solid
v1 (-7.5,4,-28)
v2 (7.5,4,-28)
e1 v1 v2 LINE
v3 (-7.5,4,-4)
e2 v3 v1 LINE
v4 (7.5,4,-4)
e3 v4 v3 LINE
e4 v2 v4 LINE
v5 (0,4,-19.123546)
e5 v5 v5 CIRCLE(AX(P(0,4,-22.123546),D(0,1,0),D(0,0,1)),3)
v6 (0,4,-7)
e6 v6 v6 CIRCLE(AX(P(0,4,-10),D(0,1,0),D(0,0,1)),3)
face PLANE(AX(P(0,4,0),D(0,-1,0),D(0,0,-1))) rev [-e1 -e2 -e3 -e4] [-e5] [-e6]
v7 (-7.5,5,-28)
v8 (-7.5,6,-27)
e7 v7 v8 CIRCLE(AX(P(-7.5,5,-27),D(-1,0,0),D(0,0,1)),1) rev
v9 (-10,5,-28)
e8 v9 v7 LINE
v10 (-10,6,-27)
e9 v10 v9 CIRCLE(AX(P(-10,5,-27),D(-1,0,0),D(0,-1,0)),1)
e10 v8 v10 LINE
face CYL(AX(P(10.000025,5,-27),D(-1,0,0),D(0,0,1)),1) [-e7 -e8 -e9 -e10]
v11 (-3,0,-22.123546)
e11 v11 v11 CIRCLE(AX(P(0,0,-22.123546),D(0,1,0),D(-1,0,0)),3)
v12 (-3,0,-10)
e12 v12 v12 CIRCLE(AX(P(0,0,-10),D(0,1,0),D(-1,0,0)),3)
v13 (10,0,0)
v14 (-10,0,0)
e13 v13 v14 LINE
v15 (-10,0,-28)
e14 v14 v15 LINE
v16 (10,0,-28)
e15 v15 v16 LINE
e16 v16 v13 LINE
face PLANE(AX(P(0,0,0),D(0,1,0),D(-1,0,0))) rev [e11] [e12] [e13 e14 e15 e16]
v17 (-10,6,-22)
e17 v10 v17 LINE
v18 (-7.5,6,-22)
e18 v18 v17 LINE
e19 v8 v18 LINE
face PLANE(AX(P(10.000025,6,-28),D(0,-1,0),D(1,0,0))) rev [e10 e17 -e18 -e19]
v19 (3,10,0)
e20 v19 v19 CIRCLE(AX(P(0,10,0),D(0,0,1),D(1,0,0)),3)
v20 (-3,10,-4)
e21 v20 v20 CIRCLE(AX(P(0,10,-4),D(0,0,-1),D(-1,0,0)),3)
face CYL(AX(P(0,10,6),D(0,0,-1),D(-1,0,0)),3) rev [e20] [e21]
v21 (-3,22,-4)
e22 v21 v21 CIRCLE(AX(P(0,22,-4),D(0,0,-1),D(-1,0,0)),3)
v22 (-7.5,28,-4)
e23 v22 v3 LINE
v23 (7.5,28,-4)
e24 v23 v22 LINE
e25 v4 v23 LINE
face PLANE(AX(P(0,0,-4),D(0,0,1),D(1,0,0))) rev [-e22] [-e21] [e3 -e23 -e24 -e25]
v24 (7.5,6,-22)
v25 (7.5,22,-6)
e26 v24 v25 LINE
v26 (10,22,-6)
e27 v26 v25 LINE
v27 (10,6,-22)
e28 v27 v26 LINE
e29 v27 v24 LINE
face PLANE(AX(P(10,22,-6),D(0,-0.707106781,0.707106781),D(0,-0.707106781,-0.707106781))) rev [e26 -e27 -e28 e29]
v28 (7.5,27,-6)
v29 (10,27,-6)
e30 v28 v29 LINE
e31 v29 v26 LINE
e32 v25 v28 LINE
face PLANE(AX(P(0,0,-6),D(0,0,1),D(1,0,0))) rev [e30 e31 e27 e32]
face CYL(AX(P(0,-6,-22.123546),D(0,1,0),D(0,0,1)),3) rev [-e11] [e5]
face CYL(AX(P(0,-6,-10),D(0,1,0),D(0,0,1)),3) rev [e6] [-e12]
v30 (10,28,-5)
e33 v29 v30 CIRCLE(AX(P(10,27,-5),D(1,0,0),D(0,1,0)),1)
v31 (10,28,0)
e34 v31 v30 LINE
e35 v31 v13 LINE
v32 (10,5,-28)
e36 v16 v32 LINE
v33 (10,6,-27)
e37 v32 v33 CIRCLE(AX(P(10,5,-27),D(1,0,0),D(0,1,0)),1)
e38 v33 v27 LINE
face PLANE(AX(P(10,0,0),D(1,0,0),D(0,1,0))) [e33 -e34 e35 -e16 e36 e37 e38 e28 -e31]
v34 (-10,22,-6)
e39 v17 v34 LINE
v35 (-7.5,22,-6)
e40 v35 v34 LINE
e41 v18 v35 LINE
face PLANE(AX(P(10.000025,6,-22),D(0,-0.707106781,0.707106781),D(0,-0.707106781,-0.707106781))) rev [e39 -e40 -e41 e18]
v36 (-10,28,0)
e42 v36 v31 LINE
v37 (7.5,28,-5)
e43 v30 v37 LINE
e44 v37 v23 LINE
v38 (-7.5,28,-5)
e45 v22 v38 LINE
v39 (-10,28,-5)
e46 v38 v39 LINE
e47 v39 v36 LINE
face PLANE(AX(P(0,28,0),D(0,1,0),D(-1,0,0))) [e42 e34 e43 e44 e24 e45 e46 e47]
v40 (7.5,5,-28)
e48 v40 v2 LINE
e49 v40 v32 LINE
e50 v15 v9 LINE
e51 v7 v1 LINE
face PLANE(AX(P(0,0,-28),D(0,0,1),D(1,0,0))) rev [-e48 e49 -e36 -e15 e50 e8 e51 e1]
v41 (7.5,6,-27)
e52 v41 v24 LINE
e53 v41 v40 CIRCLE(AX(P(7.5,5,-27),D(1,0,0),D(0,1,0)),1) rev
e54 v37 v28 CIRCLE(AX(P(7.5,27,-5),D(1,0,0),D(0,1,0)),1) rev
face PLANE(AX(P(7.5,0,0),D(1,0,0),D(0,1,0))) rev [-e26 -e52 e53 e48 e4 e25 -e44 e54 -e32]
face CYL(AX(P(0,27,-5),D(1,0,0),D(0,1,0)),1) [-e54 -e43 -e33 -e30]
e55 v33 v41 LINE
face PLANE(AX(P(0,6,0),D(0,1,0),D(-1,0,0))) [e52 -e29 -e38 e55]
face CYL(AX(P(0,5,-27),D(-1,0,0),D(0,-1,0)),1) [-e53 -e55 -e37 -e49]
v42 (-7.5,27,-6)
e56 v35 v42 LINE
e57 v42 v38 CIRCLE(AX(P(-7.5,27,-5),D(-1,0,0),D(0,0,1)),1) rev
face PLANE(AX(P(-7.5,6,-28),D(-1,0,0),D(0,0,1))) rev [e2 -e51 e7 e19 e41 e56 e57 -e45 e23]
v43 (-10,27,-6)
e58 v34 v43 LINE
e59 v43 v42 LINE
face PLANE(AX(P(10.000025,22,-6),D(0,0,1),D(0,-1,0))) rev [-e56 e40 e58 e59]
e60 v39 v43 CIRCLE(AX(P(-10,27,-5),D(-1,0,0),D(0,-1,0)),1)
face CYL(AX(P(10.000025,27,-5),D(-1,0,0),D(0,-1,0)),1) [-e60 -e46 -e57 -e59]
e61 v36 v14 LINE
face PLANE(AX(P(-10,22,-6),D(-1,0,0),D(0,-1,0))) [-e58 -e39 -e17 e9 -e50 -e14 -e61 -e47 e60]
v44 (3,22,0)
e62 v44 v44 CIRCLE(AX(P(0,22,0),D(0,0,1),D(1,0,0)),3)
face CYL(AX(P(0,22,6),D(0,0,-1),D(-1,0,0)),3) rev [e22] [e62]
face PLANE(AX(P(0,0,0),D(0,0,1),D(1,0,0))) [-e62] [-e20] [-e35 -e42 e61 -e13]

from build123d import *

# Parameters (mm, degrees)
SKETCH1_W               = 17.5
SKETCH1_H               = 16
BOSS_EXTRUDE1_DEPTH     = 6
SKETCH2_W               = 2.5
SKETCH2_H               = 16
BOSS_EXTRUDE2_DEPTH     = 22
BOSS_EXTRUDE3_DEPTH     = 2.5
BOSS_EXTRUDE4_DEPTH     = 6
SKETCH5_W               = 20
SKETCH5_H               = 28
BOSS_EXTRUDE5_DEPTH     = 6
CUT_EXTRUDE1_REACH      = 40.21
SKETCH7_W               = 15
SKETCH7_H               = 22
CUT_EXTRUDE2_REACH      = 40.21
SKETCH9_W               = 15
SKETCH9_H               = 24
CUT_EXTRUDE3_DEPTH      = 45.362146026
CUT_EXTRUDE4_DEPTH      = 39.209946349
CUT_EXTRUDE5_DEPTH      = 41.841155713
BOSS_EXTRUDE6_DEPTH     = 6
BOSS_EXTRUDE7_DEPTH     = 6
BOSS_EXTRUDE8_DEPTH     = 6
BOSS_EXTRUDE9_DEPTH     = 6
FILLET1_R               = 1
SKETCH17_W              = 15
SKETCH17_H              = 24
BOSS_EXTRUDE10_DEPTH    = 4
SKETCH18_W              = 15
SKETCH18_H              = 24
BOSS_EXTRUDE11_DEPTH    = 4
CUT_EXTRUDE6_DEPTH      = 10
CUT_EXTRUDE7_DEPTH      = 10
CUT_EXTRUDE8_DEPTH      = 39.52596527
CUT_EXTRUDE8_DEPTH_BACK = 39.52596527
SKETCH21_W              = 6
SKETCH21_H              = 1.6
CUT_EXTRUDE9_DEPTH      = 39.52596527
CUT_EXTRUDE9_DEPTH_BACK = 39.52596527
SKETCH22_W              = 6
SKETCH22_H              = 1.6


with BuildPart() as part:
    # Sketch1 → Boss-Extrude1 (new body)
    with BuildSketch(Plane.XY):
        with Locations((-1.25, 14)):
            Rectangle(SKETCH1_W, SKETCH1_H)
    extrude(amount=-BOSS_EXTRUDE1_DEPTH)

    # Sketch2 → Boss-Extrude2 (add)
    with BuildSketch(Plane(origin=(0, 0, -6), x_dir=(-1, 0, 0), z_dir=(0, 0, -1))):
        with Locations((8.75, 14)):
            Rectangle(SKETCH2_W, SKETCH2_H)
    extrude(amount=BOSS_EXTRUDE2_DEPTH)

    # Sketch3 → Boss-Extrude3 (add)
    with BuildSketch(Plane(origin=(7.5, 0, 0), x_dir=(0, 0, -1), z_dir=(1, 0, 0))):
        Polygon((6, 22), (22, 6), (0, 6), (0, 22), align=None)
    extrude(amount=BOSS_EXTRUDE3_DEPTH)

    # Sketch4 → Boss-Extrude4 (add)
    with BuildSketch(Plane(origin=(0, 22, 0), x_dir=(-1, 0, 0), z_dir=(0, 1, 0))):
        Polygon((7.5, -6), (-10, -6), (-10, 0), (10, 0), (10, -28), (7.5, -28), align=None)
    extrude(amount=BOSS_EXTRUDE4_DEPTH)

    # Sketch5 → Boss-Extrude5 (add)
    with BuildSketch(Plane.XZ.offset(-6)):
        with Locations((0, -14)):
            Rectangle(SKETCH5_W, SKETCH5_H)
    extrude(amount=BOSS_EXTRUDE5_DEPTH)

    # Sketch7 → Cut-Extrude1 (cut, up to next)
    with BuildSketch(Plane.XY.offset(-4), mode=Mode.PRIVATE) as cut_extrude1_sk1:
        with Locations((0, 17)):
            Rectangle(SKETCH7_W, SKETCH7_H)
    cut_extrude1_tool1 = extrude(cut_extrude1_sk1.sketch, amount=-CUT_EXTRUDE1_REACH, mode=Mode.PRIVATE) & part.part
    add(cut_extrude1_tool1.solids().sort_by_distance((0, 17, -4))[0], mode=Mode.SUBTRACT)

    # Sketch9 → Cut-Extrude2 (cut, up to next)
    with BuildSketch(Plane.XZ.offset(-4), mode=Mode.PRIVATE) as cut_extrude2_sk1:
        with Locations((0, -16)):
            Rectangle(SKETCH9_W, SKETCH9_H)
    cut_extrude2_tool1 = extrude(cut_extrude2_sk1.sketch, amount=-CUT_EXTRUDE2_REACH, mode=Mode.PRIVATE) & part.part
    add(cut_extrude2_tool1.solids().sort_by_distance((0, 4, -16))[0], mode=Mode.SUBTRACT)

    # Sketch10 → Cut-Extrude3 (cut, through all)
    with BuildSketch(Plane.ZY.offset(10)):
        Polygon((-28, 28), (-28, 6), (-22, 6), (-6, 22), (-6, 28), align=None)
    extrude(amount=-CUT_EXTRUDE3_DEPTH, mode=Mode.SUBTRACT)

    # Sketch11 → Cut-Extrude4 (cut, through all)
    with BuildSketch(Plane(origin=(0, 0, -4), x_dir=(-1, 0, 0), z_dir=(0, 0, -1))):
        with BuildLine():
            Line((3.25, 12.5), (3.25, 18))
            ThreePointArc((3.25, 18), (0, 21.25), (-3.25, 18))
            Line((-3.25, 18), (-3.25, 12.5))
            ThreePointArc((-3.25, 12.5), (0, 9.25), (3.25, 12.5))
        make_face()
    extrude(amount=-CUT_EXTRUDE4_DEPTH, mode=Mode.SUBTRACT)

    # Sketch12 → Cut-Extrude5 (cut, through all)
    with BuildSketch(Plane.XZ):
        with BuildLine():
            Line((3.25, -18), (3.25, -12.5))
            ThreePointArc((3.25, -12.5), (0, -9.25), (-3.25, -12.5))
            Line((-3.25, -12.5), (-3.25, -18))
            ThreePointArc((-3.25, -18), (0, -21.25), (3.25, -18))
        make_face()
    extrude(amount=-CUT_EXTRUDE5_DEPTH, mode=Mode.SUBTRACT)

    # Sketch13 → Boss-Extrude6 (add)
    with BuildSketch(Plane(origin=(3, 0, 0), x_dir=(0, 0, -1), z_dir=(1, 0, 0))):
        Polygon((0, 26.5), (-1.6, 24.9), (-1.6, 23.5), (0, 23.5), align=None)
    extrude(amount=-BOSS_EXTRUDE6_DEPTH)

    # Sketch14 → Boss-Extrude7 (add)
    with BuildSketch(Plane(origin=(3, 0, 0), x_dir=(0, 0, -1), z_dir=(1, 0, 0))):
        Polygon((0, 6.5), (-1.6, 4.9), (-1.6, 3.5), (0, 3.5), align=None)
    extrude(amount=-BOSS_EXTRUDE7_DEPTH)

    # Sketch15 → Boss-Extrude8 (add)
    with BuildSketch(Plane(origin=(3, 0, 0), x_dir=(0, 0, -1), z_dir=(1, 0, 0))):
        Polygon((23.5, 0), (23.5, -1.6), (24.9, -1.6), (26.5, 0), align=None)
    extrude(amount=-BOSS_EXTRUDE8_DEPTH)

    # Sketch16 → Boss-Extrude9 (add)
    with BuildSketch(Plane(origin=(3, 0, 0), x_dir=(0, 0, -1), z_dir=(1, 0, 0))):
        Polygon((3.5, 0), (3.5, -1.6), (4.9, -1.6), (6.5, 0), align=None)
    extrude(amount=-BOSS_EXTRUDE9_DEPTH)

    # Fillet1
    fillet1_edges = [part.edges().sort_by_distance(p)[0] for p in [
        (-8.75, 6, -28),
        (8.75, 28, -6),
        (8.75, 6, -28),
        (-8.75, 28, -6),
    ]]
    fillet(fillet1_edges, radius=FILLET1_R)

    # Sketch17 → Boss-Extrude10 (add)
    with BuildSketch(Plane(origin=(0, 4, 0), x_dir=(1, 0, 0), z_dir=(0, 1, 0))):
        with Locations((0, 16)):
            Rectangle(SKETCH17_W, SKETCH17_H)
    extrude(amount=-BOSS_EXTRUDE10_DEPTH)

    # Sketch18 → Boss-Extrude11 (add)
    with BuildSketch(Plane(origin=(0, 0, -4), x_dir=(-1, 0, 0), z_dir=(0, 0, -1))):
        with Locations((0, 16)):
            Rectangle(SKETCH18_W, SKETCH18_H)
    extrude(amount=-BOSS_EXTRUDE11_DEPTH)

    # Sketch20 → Cut-Extrude6 (cut)
    with BuildSketch(Plane(origin=(0, 0, -4), x_dir=(-1, 0, 0), z_dir=(0, 0, -1))):
        with BuildLine():
            ThreePointArc((3, 22), (2.121320344, 24.121320344), (0, 25))
            Line((0, 25), (0, 22))
            Line((0, 22), (0, 19))
            ThreePointArc((0, 19), (2.121320344, 19.878679656), (3, 22))
        make_face()
        with BuildLine():
            Line((0, 22), (0, 25))
            ThreePointArc((0, 25), (-3, 22), (0, 19))
            Line((0, 19), (0, 22))
        make_face()
        with BuildLine():
            ThreePointArc((3, 10), (2.121320344, 12.121320344), (0, 13))
            Line((0, 13), (0, 10))
            Line((0, 10), (0, 7))
            ThreePointArc((0, 7), (2.121320344, 7.878679656), (3, 10))
        make_face()
        with BuildLine():
            Line((0, 10), (0, 13))
            ThreePointArc((0, 13), (-3, 10), (0, 7))
            Line((0, 7), (0, 10))
        make_face()
    extrude(amount=-CUT_EXTRUDE6_DEPTH, mode=Mode.SUBTRACT)

    # Sketch19 → Cut-Extrude7 (cut)
    with BuildSketch(Plane(origin=(0, 4, 0), x_dir=(1, 0, 0), z_dir=(0, 1, 0))):
        with BuildLine():
            Line((0, 19.123546409), (0, 22))
            Line((0, 22), (0, 22.123546409))
            Line((0, 22.123546409), (0, 25.123546409))
            ThreePointArc((0, 25.123546409), (-3, 22.123546409), (0, 19.123546409))
        make_face()
        with BuildLine():
            Line((0, 22.123546409), (0, 22))
            Line((0, 22), (0, 19.123546409))
            ThreePointArc((0, 19.123546409), (2.121320344, 20.002226065), (3, 22.123546409))
            ThreePointArc((3, 22.123546409), (2.121320344, 24.244866752), (0, 25.123546409))
            Line((0, 25.123546409), (0, 22.123546409))
        make_face()
        with BuildLine():
            ThreePointArc((3, 10), (2.121320344, 12.121320344), (0, 13))
            Line((0, 13), (0, 10))
            Line((0, 10), (0, 7))
            ThreePointArc((0, 7), (2.121320344, 7.878679656), (3, 10))
        make_face()
        with BuildLine():
            Line((0, 10), (0, 13))
            ThreePointArc((0, 13), (-3, 10), (0, 7))
            Line((0, 7), (0, 10))
        make_face()
    extrude(amount=-CUT_EXTRUDE7_DEPTH, mode=Mode.SUBTRACT)

    # Sketch21 → Cut-Extrude8 (cut, two sides: drawn at the far end of the back side and taken through both)
    with BuildSketch(Plane.XZ.offset(-3.5).offset(-CUT_EXTRUDE8_DEPTH_BACK)):
        with Locations((0, 0.8)):
            Rectangle(SKETCH21_W, SKETCH21_H)
    extrude(amount=CUT_EXTRUDE8_DEPTH + CUT_EXTRUDE8_DEPTH_BACK, mode=Mode.SUBTRACT)

    # Sketch22 → Cut-Extrude9 (cut, two sides: drawn at the far end of the back side and taken through both)
    with BuildSketch(Plane.XY.offset(-3.5).offset(-CUT_EXTRUDE9_DEPTH_BACK)):
        with Locations((0, -0.8)):
            Rectangle(SKETCH22_W, SKETCH22_H)
    extrude(amount=CUT_EXTRUDE9_DEPTH + CUT_EXTRUDE9_DEPTH_BACK, mode=Mode.SUBTRACT)


solid = part.part
